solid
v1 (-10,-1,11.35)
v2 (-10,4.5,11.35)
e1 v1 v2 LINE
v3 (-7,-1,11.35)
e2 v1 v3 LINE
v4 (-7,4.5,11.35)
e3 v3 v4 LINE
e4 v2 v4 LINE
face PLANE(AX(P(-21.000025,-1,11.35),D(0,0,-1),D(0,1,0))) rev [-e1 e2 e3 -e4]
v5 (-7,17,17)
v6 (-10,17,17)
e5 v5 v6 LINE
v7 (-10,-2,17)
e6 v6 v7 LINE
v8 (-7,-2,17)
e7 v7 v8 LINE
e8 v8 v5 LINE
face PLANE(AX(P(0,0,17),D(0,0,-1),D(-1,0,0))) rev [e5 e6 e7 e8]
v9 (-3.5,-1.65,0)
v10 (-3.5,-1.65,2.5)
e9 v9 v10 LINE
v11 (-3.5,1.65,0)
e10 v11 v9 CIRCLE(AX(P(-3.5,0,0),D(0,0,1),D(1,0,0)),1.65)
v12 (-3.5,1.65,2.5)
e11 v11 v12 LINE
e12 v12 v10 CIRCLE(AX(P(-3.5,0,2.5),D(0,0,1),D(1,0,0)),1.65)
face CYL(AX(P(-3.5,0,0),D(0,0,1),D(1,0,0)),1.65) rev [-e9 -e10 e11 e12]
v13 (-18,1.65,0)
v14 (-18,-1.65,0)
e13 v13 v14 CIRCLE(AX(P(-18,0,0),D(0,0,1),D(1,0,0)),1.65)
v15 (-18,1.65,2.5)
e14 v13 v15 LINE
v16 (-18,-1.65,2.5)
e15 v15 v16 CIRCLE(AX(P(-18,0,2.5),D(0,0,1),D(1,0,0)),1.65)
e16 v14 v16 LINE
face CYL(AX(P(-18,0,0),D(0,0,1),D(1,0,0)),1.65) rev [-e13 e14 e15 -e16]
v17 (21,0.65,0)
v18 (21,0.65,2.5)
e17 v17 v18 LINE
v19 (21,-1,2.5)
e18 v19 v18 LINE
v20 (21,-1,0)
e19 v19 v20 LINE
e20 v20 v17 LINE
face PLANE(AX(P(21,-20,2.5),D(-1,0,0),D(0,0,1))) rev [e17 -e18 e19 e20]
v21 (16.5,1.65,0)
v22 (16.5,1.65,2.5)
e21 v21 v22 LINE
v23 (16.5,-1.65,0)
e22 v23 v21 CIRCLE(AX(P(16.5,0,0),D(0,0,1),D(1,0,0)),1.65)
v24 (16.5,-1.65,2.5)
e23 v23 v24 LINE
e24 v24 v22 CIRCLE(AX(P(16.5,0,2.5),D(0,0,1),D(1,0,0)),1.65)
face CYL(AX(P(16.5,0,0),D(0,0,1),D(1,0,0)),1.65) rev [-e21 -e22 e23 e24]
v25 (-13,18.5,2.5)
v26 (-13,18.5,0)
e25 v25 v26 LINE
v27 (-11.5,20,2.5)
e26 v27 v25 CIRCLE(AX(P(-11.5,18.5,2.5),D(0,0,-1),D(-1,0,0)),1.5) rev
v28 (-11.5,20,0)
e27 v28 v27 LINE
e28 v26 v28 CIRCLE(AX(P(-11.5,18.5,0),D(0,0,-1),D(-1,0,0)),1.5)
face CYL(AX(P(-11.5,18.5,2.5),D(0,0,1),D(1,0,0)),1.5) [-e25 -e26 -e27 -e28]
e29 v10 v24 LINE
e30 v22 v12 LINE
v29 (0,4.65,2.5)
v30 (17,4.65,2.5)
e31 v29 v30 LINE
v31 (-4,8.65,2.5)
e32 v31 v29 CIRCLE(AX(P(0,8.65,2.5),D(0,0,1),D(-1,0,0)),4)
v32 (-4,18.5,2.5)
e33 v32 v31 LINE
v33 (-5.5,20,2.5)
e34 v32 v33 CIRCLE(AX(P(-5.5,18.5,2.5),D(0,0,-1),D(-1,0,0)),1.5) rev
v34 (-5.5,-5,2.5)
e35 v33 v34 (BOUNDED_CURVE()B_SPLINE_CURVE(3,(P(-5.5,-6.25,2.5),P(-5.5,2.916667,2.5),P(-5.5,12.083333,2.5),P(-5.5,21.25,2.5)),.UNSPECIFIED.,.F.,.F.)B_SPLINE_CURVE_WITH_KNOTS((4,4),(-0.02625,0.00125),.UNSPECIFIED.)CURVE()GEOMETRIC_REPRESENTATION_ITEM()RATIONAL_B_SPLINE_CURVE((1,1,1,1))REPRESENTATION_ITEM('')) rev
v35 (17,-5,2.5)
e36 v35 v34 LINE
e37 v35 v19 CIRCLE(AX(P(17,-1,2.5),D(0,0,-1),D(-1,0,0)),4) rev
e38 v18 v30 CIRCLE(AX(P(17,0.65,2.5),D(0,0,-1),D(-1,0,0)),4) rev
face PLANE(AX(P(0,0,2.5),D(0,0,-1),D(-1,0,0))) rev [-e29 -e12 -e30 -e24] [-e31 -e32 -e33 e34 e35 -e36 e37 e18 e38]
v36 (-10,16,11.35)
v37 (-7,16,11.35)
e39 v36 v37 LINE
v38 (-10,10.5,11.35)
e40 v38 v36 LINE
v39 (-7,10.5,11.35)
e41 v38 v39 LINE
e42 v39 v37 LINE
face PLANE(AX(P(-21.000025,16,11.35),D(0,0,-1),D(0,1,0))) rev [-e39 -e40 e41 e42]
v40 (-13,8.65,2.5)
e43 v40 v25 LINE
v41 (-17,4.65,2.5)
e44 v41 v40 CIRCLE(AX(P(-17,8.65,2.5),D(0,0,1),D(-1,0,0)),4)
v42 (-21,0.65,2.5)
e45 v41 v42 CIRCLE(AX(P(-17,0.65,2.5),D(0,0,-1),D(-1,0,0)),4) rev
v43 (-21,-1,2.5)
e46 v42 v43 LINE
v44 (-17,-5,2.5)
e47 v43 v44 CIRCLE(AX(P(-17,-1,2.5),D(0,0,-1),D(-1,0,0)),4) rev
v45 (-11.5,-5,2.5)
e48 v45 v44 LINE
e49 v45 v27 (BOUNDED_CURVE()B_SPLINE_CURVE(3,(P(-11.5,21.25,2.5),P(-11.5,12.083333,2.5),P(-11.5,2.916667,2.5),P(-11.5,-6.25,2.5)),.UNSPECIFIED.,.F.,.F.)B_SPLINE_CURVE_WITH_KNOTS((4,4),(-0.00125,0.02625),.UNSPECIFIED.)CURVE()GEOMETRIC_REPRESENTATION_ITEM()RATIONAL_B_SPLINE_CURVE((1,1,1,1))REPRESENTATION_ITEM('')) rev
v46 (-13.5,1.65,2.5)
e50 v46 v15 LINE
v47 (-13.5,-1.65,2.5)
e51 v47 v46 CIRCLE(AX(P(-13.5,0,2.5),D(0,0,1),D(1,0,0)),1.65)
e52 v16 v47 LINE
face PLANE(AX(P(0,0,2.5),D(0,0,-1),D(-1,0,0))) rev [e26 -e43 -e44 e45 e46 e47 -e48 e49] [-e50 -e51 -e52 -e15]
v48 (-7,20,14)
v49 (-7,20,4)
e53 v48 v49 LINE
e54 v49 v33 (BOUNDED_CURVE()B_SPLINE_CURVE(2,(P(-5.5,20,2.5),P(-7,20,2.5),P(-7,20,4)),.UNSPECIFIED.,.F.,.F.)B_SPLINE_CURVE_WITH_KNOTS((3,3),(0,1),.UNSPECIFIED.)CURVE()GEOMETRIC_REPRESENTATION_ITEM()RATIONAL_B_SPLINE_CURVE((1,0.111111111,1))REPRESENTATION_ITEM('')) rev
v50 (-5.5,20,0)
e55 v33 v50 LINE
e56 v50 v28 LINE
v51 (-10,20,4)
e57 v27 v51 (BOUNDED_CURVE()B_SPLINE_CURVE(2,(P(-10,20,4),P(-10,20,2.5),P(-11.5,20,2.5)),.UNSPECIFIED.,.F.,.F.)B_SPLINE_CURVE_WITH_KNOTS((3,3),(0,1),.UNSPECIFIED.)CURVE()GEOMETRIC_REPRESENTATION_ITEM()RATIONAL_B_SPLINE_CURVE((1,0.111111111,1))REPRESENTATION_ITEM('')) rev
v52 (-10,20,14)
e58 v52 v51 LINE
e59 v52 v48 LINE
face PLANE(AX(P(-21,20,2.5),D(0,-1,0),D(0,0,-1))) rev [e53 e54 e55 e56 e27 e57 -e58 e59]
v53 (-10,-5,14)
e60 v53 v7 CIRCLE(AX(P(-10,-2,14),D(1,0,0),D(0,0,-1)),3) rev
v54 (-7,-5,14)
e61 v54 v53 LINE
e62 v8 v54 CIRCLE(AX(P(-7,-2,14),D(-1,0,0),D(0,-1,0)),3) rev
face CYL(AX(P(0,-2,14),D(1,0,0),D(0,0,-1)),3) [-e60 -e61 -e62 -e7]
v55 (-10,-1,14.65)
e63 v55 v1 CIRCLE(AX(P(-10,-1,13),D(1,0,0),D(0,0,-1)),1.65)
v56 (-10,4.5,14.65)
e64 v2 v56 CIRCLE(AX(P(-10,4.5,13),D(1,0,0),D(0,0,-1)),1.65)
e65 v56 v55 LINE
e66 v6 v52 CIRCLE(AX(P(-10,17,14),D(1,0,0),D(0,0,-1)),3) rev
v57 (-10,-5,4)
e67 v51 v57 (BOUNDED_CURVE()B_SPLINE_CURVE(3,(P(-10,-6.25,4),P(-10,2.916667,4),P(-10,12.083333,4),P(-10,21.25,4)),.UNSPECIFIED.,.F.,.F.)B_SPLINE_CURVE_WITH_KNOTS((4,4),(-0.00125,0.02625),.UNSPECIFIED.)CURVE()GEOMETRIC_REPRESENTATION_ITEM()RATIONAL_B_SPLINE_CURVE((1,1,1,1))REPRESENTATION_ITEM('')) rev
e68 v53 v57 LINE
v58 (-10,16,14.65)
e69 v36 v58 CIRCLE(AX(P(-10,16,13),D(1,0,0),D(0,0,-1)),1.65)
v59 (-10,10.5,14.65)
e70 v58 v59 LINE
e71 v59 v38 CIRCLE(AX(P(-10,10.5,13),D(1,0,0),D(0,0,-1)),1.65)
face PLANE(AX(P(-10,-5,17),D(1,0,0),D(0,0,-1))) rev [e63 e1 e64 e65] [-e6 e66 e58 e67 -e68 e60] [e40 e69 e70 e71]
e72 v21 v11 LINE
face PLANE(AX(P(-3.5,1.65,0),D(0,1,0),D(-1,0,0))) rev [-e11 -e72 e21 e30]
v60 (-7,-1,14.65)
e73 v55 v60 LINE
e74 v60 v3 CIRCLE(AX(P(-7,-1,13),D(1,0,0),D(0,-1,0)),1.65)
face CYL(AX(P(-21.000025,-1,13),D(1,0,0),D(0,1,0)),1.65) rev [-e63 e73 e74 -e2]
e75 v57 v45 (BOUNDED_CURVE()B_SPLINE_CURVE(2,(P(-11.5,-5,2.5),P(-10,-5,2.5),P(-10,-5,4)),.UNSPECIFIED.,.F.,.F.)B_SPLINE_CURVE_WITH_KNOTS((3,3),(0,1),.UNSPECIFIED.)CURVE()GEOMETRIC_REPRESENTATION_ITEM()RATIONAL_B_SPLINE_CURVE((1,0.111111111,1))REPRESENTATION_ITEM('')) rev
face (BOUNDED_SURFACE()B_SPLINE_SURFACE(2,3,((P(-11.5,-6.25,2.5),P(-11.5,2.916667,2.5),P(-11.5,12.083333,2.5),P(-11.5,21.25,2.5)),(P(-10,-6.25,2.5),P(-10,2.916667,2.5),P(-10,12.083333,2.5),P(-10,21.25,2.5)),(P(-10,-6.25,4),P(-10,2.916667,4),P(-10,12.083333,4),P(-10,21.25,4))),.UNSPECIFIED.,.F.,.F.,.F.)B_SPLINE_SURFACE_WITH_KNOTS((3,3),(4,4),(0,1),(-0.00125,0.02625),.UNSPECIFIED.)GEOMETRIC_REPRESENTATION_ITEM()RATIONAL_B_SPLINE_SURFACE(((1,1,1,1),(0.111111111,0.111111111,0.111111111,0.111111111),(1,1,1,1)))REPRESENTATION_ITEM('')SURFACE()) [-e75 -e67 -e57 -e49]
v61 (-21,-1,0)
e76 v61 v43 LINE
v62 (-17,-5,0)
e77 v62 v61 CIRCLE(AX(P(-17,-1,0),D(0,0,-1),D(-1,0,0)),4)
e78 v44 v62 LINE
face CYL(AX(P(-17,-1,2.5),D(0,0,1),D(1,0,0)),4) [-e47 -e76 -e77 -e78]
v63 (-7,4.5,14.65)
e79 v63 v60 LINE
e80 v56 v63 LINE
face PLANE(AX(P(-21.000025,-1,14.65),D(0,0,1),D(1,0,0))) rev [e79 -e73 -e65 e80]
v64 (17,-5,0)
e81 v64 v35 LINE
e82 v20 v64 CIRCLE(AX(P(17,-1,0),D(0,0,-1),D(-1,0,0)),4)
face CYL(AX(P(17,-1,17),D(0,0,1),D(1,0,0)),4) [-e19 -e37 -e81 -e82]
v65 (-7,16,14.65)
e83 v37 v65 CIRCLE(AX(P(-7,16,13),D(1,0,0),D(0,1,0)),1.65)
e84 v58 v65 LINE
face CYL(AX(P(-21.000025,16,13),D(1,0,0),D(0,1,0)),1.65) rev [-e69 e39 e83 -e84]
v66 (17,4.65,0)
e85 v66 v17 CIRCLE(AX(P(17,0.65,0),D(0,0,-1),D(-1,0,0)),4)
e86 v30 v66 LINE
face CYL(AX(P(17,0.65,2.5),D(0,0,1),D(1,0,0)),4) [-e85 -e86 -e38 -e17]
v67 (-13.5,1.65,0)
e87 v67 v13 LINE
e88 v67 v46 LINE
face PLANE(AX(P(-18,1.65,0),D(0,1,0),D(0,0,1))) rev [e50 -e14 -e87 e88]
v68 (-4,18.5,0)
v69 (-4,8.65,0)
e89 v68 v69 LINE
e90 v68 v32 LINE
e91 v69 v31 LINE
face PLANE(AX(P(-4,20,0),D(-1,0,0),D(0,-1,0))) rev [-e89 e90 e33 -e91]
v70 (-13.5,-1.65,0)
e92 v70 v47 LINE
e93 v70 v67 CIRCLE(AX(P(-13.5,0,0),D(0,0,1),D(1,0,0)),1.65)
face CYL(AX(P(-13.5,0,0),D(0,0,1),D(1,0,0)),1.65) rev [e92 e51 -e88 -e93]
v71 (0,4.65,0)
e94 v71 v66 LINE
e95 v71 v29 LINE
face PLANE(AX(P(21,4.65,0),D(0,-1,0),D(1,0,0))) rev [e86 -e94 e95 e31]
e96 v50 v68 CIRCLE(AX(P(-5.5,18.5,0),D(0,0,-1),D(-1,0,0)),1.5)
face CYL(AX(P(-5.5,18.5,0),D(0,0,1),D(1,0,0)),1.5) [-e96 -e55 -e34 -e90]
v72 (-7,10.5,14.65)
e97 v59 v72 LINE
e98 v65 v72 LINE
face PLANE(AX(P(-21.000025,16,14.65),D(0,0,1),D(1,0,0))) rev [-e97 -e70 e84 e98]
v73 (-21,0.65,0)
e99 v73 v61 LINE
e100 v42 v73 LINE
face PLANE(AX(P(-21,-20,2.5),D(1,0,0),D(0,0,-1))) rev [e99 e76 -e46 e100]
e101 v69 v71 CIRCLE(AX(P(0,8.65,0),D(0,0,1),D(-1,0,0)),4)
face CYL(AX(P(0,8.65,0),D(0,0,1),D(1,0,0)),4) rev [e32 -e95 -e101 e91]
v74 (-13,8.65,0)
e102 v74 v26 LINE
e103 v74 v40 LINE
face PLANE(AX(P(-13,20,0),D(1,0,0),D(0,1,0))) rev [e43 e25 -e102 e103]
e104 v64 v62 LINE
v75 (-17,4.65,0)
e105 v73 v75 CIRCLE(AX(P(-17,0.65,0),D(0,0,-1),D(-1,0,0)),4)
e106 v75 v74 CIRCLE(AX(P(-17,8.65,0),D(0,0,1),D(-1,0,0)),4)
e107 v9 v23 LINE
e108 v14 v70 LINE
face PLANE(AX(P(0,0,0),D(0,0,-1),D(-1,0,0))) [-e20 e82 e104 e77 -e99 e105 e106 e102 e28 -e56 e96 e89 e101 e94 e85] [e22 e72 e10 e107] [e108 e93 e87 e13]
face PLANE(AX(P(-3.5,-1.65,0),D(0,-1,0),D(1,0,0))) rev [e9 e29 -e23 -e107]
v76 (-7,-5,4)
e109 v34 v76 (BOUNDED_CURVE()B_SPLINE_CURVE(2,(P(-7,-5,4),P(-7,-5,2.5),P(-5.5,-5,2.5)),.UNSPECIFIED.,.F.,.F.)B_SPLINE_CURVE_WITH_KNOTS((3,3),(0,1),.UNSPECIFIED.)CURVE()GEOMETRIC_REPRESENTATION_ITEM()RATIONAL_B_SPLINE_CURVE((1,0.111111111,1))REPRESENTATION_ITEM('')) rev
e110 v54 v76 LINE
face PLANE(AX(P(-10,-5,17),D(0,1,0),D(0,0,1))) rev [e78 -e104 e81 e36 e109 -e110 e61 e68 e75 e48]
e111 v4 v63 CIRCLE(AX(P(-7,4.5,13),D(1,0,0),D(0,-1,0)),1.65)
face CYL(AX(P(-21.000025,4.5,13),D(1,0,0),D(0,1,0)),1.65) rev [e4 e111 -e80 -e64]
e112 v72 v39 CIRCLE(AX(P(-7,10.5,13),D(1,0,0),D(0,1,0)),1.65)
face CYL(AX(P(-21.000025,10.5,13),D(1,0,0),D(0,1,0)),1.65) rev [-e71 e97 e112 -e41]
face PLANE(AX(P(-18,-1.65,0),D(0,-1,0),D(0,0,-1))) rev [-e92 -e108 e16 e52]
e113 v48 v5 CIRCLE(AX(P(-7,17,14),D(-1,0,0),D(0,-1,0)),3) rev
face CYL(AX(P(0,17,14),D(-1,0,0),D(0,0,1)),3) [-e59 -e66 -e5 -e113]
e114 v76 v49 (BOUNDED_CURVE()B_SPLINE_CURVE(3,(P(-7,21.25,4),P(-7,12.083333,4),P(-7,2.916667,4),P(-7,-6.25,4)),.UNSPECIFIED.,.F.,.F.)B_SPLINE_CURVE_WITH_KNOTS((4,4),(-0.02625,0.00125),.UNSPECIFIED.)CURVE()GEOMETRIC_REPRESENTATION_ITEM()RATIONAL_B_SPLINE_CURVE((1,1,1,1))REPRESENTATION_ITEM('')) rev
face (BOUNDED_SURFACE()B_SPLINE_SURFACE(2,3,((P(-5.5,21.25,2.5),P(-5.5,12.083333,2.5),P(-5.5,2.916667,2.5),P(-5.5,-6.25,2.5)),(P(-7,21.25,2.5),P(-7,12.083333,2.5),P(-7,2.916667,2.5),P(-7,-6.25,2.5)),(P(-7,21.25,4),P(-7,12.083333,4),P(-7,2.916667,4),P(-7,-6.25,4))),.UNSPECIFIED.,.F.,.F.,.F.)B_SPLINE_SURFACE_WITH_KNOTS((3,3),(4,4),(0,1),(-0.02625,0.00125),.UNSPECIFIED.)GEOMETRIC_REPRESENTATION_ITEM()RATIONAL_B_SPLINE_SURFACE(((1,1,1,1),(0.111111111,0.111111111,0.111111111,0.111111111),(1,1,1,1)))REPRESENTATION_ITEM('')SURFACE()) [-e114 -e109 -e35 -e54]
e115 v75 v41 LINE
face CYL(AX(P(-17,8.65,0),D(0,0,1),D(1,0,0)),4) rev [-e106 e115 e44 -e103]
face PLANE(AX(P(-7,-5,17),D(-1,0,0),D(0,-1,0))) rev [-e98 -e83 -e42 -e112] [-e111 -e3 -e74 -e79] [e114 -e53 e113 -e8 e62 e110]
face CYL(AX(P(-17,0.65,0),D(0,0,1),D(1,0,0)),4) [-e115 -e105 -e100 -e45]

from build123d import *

# Parameters (mm, degrees)
SKETCH_1_W          = 42
SKETCH_1_H          = 40
EXTRUDE_1_DEPTH     = 2.5
SKETCH_2_W          = 3
SKETCH_2_H          = 25
EXTRUDE_2_DEPTH     = 14.5
CUT_EXTRUDE_2_DEPTH = 33.422985674
CUT_EXTRUDE_3_DEPTH = 39.379682125
SKETCH_6_W          = 42
SKETCH_6_H          = 15
CUT_EXTRUDE_4_DEPTH = 33.422985674
CUT_EXTRUDE_5_DEPTH = 33.422985674
FILLET_2_R          = 3
FILLET_3_SIZE       = 1.5
FILLET_4_R          = 1.5
FILLET_5_R          = 4


# Some blends are built 0.0001 mm under size
with BuildPart() as part:
    # 草图1 → 凸台-拉伸1 (new body)
    with BuildSketch(Plane.XY):
        Rectangle(SKETCH_1_W, SKETCH_1_H)
    extrude(amount=EXTRUDE_1_DEPTH)

    # 草图2 → 凸台-拉伸2 (add)
    with BuildSketch(Plane.XY.offset(2.5)):
        with Locations((-8.5, 7.5)):
            Rectangle(SKETCH_2_W, SKETCH_2_H)
    extrude(amount=EXTRUDE_2_DEPTH)

    # 草图5 → 切除-拉伸2 (cut, through all)
    with BuildSketch(Plane.XY.offset(2.5)):
        with BuildLine():
            Line((-18, 1.65), (-13.5, 1.65))
            ThreePointArc((-13.5, 1.65), (-11.85, 0), (-13.5, -1.65))
            Line((-13.5, -1.65), (-18, -1.65))
            ThreePointArc((-18, -1.65), (-19.65, 0), (-18, 1.65))
        make_face()
        with BuildLine():
            Line((-3.5, 1.65), (16.5, 1.65))
            ThreePointArc((16.5, 1.65), (18.15, 0), (16.5, -1.65))
            Line((16.5, -1.65), (-3.5, -1.65))
            ThreePointArc((-3.5, -1.65), (-5.15, 0), (-3.5, 1.65))
        make_face()
    extrude(amount=-CUT_EXTRUDE_2_DEPTH, mode=Mode.SUBTRACT)

    # 草图4 → 切除-拉伸3 (cut, through all)
    with BuildSketch(Plane(origin=(-7, 0, 0), x_dir=(0, 0, -1), z_dir=(1, 0, 0))):
        with BuildLine():
            Line((-11.35, 16), (-11.35, 10.5))
            ThreePointArc((-11.35, 10.5), (-13, 8.85), (-14.65, 10.5))
            Line((-14.65, 10.5), (-14.65, 16))
            ThreePointArc((-14.65, 16), (-13, 17.65), (-11.35, 16))
        make_face()
        with BuildLine():
            Line((-11.35, -1), (-11.35, 4.5))
            ThreePointArc((-11.35, 4.5), (-13, 6.15), (-14.65, 4.5))
            Line((-14.65, 4.5), (-14.65, -1))
            ThreePointArc((-14.65, -1), (-13, -2.65), (-11.35, -1))
        make_face()
    extrude(amount=-CUT_EXTRUDE_3_DEPTH, mode=Mode.SUBTRACT)

    # 草图6 → 切除-拉伸4 (cut, through all)
    with BuildSketch(Plane.XY.offset(2.5)):
        with Locations((0, -12.5)):
            Rectangle(SKETCH_6_W, SKETCH_6_H)
    extrude(amount=-CUT_EXTRUDE_4_DEPTH, mode=Mode.SUBTRACT)

    # 草图7 → 切除-拉伸5 (cut, through all)
    with BuildSketch(Plane.XY.offset(2.5)):
        with BuildLine():
            Line((-21, 20), (-13, 20))
            Line((-13, 20), (-13, 8.65))
            ThreePointArc((-13, 8.65), (-14.171572875, 5.821572875), (-17, 4.65))
            Line((-17, 4.65), (-21, 4.65))
            Line((-21, 4.65), (-21, 20))
        make_face()
        with BuildLine():
            Line((21, 20), (-4, 20))
            Line((-4, 20), (-4, 8.65))
            ThreePointArc((-4, 8.65), (-2.828427125, 5.821572875), (0, 4.65))
            Line((0, 4.65), (21, 4.65))
            Line((21, 4.65), (21, 20))
        make_face()
    extrude(amount=-CUT_EXTRUDE_5_DEPTH, mode=Mode.SUBTRACT)

    # 圆角2
    fillet_2_edges = [part.edges().sort_by_distance(p)[0] for p in [
        (-8.5, 20, 17),
        (-8.5, -5, 17),
    ]]
    fillet(fillet_2_edges, radius=FILLET_2_R)

    # 圆角3
    # a fillet whose section is not a circle: 1.5 mm, written as the material it adds along each edge
    with BuildSketch(Plane(origin=(-10, 20, 2.5), x_dir=(0, 0, 1), z_dir=(0, -1, 0)), Plane(origin=(-7, -5, 2.5), x_dir=(0, 0, 1), z_dir=(0, 1, 0))) as fillet_3_piece_1:
        with BuildLine():
            Bezier((FILLET_3_SIZE, 0), (0, 0), (0, FILLET_3_SIZE), weights=[1, 0.111111111, 1])
            Line((0, FILLET_3_SIZE), (0, 0))
            Line((0, 0), (FILLET_3_SIZE, 0))
        make_face()
    extrude(amount=25)

    # 圆角4
    fillet_4_edges = [part.edges().sort_by_distance(p)[0] for p in [
        (-4, 20, 1.25),
        (-13, 20, 1.25),
    ]]
    fillet(fillet_4_edges, radius=FILLET_4_R)

    # 圆角5
    fillet_5_edges = [part.edges().sort_by_distance(p)[0] for p in [
        (-21, -5, 1.25),
        (-21, 4.65, 1.25),
        (21, -5, 1.25),
        (21, 4.65, 1.25),
    ]]
    fillet(fillet_5_edges, radius=FILLET_5_R - 0.0001)  # a hair under: the kernel refuses the full size


solid = part.part
